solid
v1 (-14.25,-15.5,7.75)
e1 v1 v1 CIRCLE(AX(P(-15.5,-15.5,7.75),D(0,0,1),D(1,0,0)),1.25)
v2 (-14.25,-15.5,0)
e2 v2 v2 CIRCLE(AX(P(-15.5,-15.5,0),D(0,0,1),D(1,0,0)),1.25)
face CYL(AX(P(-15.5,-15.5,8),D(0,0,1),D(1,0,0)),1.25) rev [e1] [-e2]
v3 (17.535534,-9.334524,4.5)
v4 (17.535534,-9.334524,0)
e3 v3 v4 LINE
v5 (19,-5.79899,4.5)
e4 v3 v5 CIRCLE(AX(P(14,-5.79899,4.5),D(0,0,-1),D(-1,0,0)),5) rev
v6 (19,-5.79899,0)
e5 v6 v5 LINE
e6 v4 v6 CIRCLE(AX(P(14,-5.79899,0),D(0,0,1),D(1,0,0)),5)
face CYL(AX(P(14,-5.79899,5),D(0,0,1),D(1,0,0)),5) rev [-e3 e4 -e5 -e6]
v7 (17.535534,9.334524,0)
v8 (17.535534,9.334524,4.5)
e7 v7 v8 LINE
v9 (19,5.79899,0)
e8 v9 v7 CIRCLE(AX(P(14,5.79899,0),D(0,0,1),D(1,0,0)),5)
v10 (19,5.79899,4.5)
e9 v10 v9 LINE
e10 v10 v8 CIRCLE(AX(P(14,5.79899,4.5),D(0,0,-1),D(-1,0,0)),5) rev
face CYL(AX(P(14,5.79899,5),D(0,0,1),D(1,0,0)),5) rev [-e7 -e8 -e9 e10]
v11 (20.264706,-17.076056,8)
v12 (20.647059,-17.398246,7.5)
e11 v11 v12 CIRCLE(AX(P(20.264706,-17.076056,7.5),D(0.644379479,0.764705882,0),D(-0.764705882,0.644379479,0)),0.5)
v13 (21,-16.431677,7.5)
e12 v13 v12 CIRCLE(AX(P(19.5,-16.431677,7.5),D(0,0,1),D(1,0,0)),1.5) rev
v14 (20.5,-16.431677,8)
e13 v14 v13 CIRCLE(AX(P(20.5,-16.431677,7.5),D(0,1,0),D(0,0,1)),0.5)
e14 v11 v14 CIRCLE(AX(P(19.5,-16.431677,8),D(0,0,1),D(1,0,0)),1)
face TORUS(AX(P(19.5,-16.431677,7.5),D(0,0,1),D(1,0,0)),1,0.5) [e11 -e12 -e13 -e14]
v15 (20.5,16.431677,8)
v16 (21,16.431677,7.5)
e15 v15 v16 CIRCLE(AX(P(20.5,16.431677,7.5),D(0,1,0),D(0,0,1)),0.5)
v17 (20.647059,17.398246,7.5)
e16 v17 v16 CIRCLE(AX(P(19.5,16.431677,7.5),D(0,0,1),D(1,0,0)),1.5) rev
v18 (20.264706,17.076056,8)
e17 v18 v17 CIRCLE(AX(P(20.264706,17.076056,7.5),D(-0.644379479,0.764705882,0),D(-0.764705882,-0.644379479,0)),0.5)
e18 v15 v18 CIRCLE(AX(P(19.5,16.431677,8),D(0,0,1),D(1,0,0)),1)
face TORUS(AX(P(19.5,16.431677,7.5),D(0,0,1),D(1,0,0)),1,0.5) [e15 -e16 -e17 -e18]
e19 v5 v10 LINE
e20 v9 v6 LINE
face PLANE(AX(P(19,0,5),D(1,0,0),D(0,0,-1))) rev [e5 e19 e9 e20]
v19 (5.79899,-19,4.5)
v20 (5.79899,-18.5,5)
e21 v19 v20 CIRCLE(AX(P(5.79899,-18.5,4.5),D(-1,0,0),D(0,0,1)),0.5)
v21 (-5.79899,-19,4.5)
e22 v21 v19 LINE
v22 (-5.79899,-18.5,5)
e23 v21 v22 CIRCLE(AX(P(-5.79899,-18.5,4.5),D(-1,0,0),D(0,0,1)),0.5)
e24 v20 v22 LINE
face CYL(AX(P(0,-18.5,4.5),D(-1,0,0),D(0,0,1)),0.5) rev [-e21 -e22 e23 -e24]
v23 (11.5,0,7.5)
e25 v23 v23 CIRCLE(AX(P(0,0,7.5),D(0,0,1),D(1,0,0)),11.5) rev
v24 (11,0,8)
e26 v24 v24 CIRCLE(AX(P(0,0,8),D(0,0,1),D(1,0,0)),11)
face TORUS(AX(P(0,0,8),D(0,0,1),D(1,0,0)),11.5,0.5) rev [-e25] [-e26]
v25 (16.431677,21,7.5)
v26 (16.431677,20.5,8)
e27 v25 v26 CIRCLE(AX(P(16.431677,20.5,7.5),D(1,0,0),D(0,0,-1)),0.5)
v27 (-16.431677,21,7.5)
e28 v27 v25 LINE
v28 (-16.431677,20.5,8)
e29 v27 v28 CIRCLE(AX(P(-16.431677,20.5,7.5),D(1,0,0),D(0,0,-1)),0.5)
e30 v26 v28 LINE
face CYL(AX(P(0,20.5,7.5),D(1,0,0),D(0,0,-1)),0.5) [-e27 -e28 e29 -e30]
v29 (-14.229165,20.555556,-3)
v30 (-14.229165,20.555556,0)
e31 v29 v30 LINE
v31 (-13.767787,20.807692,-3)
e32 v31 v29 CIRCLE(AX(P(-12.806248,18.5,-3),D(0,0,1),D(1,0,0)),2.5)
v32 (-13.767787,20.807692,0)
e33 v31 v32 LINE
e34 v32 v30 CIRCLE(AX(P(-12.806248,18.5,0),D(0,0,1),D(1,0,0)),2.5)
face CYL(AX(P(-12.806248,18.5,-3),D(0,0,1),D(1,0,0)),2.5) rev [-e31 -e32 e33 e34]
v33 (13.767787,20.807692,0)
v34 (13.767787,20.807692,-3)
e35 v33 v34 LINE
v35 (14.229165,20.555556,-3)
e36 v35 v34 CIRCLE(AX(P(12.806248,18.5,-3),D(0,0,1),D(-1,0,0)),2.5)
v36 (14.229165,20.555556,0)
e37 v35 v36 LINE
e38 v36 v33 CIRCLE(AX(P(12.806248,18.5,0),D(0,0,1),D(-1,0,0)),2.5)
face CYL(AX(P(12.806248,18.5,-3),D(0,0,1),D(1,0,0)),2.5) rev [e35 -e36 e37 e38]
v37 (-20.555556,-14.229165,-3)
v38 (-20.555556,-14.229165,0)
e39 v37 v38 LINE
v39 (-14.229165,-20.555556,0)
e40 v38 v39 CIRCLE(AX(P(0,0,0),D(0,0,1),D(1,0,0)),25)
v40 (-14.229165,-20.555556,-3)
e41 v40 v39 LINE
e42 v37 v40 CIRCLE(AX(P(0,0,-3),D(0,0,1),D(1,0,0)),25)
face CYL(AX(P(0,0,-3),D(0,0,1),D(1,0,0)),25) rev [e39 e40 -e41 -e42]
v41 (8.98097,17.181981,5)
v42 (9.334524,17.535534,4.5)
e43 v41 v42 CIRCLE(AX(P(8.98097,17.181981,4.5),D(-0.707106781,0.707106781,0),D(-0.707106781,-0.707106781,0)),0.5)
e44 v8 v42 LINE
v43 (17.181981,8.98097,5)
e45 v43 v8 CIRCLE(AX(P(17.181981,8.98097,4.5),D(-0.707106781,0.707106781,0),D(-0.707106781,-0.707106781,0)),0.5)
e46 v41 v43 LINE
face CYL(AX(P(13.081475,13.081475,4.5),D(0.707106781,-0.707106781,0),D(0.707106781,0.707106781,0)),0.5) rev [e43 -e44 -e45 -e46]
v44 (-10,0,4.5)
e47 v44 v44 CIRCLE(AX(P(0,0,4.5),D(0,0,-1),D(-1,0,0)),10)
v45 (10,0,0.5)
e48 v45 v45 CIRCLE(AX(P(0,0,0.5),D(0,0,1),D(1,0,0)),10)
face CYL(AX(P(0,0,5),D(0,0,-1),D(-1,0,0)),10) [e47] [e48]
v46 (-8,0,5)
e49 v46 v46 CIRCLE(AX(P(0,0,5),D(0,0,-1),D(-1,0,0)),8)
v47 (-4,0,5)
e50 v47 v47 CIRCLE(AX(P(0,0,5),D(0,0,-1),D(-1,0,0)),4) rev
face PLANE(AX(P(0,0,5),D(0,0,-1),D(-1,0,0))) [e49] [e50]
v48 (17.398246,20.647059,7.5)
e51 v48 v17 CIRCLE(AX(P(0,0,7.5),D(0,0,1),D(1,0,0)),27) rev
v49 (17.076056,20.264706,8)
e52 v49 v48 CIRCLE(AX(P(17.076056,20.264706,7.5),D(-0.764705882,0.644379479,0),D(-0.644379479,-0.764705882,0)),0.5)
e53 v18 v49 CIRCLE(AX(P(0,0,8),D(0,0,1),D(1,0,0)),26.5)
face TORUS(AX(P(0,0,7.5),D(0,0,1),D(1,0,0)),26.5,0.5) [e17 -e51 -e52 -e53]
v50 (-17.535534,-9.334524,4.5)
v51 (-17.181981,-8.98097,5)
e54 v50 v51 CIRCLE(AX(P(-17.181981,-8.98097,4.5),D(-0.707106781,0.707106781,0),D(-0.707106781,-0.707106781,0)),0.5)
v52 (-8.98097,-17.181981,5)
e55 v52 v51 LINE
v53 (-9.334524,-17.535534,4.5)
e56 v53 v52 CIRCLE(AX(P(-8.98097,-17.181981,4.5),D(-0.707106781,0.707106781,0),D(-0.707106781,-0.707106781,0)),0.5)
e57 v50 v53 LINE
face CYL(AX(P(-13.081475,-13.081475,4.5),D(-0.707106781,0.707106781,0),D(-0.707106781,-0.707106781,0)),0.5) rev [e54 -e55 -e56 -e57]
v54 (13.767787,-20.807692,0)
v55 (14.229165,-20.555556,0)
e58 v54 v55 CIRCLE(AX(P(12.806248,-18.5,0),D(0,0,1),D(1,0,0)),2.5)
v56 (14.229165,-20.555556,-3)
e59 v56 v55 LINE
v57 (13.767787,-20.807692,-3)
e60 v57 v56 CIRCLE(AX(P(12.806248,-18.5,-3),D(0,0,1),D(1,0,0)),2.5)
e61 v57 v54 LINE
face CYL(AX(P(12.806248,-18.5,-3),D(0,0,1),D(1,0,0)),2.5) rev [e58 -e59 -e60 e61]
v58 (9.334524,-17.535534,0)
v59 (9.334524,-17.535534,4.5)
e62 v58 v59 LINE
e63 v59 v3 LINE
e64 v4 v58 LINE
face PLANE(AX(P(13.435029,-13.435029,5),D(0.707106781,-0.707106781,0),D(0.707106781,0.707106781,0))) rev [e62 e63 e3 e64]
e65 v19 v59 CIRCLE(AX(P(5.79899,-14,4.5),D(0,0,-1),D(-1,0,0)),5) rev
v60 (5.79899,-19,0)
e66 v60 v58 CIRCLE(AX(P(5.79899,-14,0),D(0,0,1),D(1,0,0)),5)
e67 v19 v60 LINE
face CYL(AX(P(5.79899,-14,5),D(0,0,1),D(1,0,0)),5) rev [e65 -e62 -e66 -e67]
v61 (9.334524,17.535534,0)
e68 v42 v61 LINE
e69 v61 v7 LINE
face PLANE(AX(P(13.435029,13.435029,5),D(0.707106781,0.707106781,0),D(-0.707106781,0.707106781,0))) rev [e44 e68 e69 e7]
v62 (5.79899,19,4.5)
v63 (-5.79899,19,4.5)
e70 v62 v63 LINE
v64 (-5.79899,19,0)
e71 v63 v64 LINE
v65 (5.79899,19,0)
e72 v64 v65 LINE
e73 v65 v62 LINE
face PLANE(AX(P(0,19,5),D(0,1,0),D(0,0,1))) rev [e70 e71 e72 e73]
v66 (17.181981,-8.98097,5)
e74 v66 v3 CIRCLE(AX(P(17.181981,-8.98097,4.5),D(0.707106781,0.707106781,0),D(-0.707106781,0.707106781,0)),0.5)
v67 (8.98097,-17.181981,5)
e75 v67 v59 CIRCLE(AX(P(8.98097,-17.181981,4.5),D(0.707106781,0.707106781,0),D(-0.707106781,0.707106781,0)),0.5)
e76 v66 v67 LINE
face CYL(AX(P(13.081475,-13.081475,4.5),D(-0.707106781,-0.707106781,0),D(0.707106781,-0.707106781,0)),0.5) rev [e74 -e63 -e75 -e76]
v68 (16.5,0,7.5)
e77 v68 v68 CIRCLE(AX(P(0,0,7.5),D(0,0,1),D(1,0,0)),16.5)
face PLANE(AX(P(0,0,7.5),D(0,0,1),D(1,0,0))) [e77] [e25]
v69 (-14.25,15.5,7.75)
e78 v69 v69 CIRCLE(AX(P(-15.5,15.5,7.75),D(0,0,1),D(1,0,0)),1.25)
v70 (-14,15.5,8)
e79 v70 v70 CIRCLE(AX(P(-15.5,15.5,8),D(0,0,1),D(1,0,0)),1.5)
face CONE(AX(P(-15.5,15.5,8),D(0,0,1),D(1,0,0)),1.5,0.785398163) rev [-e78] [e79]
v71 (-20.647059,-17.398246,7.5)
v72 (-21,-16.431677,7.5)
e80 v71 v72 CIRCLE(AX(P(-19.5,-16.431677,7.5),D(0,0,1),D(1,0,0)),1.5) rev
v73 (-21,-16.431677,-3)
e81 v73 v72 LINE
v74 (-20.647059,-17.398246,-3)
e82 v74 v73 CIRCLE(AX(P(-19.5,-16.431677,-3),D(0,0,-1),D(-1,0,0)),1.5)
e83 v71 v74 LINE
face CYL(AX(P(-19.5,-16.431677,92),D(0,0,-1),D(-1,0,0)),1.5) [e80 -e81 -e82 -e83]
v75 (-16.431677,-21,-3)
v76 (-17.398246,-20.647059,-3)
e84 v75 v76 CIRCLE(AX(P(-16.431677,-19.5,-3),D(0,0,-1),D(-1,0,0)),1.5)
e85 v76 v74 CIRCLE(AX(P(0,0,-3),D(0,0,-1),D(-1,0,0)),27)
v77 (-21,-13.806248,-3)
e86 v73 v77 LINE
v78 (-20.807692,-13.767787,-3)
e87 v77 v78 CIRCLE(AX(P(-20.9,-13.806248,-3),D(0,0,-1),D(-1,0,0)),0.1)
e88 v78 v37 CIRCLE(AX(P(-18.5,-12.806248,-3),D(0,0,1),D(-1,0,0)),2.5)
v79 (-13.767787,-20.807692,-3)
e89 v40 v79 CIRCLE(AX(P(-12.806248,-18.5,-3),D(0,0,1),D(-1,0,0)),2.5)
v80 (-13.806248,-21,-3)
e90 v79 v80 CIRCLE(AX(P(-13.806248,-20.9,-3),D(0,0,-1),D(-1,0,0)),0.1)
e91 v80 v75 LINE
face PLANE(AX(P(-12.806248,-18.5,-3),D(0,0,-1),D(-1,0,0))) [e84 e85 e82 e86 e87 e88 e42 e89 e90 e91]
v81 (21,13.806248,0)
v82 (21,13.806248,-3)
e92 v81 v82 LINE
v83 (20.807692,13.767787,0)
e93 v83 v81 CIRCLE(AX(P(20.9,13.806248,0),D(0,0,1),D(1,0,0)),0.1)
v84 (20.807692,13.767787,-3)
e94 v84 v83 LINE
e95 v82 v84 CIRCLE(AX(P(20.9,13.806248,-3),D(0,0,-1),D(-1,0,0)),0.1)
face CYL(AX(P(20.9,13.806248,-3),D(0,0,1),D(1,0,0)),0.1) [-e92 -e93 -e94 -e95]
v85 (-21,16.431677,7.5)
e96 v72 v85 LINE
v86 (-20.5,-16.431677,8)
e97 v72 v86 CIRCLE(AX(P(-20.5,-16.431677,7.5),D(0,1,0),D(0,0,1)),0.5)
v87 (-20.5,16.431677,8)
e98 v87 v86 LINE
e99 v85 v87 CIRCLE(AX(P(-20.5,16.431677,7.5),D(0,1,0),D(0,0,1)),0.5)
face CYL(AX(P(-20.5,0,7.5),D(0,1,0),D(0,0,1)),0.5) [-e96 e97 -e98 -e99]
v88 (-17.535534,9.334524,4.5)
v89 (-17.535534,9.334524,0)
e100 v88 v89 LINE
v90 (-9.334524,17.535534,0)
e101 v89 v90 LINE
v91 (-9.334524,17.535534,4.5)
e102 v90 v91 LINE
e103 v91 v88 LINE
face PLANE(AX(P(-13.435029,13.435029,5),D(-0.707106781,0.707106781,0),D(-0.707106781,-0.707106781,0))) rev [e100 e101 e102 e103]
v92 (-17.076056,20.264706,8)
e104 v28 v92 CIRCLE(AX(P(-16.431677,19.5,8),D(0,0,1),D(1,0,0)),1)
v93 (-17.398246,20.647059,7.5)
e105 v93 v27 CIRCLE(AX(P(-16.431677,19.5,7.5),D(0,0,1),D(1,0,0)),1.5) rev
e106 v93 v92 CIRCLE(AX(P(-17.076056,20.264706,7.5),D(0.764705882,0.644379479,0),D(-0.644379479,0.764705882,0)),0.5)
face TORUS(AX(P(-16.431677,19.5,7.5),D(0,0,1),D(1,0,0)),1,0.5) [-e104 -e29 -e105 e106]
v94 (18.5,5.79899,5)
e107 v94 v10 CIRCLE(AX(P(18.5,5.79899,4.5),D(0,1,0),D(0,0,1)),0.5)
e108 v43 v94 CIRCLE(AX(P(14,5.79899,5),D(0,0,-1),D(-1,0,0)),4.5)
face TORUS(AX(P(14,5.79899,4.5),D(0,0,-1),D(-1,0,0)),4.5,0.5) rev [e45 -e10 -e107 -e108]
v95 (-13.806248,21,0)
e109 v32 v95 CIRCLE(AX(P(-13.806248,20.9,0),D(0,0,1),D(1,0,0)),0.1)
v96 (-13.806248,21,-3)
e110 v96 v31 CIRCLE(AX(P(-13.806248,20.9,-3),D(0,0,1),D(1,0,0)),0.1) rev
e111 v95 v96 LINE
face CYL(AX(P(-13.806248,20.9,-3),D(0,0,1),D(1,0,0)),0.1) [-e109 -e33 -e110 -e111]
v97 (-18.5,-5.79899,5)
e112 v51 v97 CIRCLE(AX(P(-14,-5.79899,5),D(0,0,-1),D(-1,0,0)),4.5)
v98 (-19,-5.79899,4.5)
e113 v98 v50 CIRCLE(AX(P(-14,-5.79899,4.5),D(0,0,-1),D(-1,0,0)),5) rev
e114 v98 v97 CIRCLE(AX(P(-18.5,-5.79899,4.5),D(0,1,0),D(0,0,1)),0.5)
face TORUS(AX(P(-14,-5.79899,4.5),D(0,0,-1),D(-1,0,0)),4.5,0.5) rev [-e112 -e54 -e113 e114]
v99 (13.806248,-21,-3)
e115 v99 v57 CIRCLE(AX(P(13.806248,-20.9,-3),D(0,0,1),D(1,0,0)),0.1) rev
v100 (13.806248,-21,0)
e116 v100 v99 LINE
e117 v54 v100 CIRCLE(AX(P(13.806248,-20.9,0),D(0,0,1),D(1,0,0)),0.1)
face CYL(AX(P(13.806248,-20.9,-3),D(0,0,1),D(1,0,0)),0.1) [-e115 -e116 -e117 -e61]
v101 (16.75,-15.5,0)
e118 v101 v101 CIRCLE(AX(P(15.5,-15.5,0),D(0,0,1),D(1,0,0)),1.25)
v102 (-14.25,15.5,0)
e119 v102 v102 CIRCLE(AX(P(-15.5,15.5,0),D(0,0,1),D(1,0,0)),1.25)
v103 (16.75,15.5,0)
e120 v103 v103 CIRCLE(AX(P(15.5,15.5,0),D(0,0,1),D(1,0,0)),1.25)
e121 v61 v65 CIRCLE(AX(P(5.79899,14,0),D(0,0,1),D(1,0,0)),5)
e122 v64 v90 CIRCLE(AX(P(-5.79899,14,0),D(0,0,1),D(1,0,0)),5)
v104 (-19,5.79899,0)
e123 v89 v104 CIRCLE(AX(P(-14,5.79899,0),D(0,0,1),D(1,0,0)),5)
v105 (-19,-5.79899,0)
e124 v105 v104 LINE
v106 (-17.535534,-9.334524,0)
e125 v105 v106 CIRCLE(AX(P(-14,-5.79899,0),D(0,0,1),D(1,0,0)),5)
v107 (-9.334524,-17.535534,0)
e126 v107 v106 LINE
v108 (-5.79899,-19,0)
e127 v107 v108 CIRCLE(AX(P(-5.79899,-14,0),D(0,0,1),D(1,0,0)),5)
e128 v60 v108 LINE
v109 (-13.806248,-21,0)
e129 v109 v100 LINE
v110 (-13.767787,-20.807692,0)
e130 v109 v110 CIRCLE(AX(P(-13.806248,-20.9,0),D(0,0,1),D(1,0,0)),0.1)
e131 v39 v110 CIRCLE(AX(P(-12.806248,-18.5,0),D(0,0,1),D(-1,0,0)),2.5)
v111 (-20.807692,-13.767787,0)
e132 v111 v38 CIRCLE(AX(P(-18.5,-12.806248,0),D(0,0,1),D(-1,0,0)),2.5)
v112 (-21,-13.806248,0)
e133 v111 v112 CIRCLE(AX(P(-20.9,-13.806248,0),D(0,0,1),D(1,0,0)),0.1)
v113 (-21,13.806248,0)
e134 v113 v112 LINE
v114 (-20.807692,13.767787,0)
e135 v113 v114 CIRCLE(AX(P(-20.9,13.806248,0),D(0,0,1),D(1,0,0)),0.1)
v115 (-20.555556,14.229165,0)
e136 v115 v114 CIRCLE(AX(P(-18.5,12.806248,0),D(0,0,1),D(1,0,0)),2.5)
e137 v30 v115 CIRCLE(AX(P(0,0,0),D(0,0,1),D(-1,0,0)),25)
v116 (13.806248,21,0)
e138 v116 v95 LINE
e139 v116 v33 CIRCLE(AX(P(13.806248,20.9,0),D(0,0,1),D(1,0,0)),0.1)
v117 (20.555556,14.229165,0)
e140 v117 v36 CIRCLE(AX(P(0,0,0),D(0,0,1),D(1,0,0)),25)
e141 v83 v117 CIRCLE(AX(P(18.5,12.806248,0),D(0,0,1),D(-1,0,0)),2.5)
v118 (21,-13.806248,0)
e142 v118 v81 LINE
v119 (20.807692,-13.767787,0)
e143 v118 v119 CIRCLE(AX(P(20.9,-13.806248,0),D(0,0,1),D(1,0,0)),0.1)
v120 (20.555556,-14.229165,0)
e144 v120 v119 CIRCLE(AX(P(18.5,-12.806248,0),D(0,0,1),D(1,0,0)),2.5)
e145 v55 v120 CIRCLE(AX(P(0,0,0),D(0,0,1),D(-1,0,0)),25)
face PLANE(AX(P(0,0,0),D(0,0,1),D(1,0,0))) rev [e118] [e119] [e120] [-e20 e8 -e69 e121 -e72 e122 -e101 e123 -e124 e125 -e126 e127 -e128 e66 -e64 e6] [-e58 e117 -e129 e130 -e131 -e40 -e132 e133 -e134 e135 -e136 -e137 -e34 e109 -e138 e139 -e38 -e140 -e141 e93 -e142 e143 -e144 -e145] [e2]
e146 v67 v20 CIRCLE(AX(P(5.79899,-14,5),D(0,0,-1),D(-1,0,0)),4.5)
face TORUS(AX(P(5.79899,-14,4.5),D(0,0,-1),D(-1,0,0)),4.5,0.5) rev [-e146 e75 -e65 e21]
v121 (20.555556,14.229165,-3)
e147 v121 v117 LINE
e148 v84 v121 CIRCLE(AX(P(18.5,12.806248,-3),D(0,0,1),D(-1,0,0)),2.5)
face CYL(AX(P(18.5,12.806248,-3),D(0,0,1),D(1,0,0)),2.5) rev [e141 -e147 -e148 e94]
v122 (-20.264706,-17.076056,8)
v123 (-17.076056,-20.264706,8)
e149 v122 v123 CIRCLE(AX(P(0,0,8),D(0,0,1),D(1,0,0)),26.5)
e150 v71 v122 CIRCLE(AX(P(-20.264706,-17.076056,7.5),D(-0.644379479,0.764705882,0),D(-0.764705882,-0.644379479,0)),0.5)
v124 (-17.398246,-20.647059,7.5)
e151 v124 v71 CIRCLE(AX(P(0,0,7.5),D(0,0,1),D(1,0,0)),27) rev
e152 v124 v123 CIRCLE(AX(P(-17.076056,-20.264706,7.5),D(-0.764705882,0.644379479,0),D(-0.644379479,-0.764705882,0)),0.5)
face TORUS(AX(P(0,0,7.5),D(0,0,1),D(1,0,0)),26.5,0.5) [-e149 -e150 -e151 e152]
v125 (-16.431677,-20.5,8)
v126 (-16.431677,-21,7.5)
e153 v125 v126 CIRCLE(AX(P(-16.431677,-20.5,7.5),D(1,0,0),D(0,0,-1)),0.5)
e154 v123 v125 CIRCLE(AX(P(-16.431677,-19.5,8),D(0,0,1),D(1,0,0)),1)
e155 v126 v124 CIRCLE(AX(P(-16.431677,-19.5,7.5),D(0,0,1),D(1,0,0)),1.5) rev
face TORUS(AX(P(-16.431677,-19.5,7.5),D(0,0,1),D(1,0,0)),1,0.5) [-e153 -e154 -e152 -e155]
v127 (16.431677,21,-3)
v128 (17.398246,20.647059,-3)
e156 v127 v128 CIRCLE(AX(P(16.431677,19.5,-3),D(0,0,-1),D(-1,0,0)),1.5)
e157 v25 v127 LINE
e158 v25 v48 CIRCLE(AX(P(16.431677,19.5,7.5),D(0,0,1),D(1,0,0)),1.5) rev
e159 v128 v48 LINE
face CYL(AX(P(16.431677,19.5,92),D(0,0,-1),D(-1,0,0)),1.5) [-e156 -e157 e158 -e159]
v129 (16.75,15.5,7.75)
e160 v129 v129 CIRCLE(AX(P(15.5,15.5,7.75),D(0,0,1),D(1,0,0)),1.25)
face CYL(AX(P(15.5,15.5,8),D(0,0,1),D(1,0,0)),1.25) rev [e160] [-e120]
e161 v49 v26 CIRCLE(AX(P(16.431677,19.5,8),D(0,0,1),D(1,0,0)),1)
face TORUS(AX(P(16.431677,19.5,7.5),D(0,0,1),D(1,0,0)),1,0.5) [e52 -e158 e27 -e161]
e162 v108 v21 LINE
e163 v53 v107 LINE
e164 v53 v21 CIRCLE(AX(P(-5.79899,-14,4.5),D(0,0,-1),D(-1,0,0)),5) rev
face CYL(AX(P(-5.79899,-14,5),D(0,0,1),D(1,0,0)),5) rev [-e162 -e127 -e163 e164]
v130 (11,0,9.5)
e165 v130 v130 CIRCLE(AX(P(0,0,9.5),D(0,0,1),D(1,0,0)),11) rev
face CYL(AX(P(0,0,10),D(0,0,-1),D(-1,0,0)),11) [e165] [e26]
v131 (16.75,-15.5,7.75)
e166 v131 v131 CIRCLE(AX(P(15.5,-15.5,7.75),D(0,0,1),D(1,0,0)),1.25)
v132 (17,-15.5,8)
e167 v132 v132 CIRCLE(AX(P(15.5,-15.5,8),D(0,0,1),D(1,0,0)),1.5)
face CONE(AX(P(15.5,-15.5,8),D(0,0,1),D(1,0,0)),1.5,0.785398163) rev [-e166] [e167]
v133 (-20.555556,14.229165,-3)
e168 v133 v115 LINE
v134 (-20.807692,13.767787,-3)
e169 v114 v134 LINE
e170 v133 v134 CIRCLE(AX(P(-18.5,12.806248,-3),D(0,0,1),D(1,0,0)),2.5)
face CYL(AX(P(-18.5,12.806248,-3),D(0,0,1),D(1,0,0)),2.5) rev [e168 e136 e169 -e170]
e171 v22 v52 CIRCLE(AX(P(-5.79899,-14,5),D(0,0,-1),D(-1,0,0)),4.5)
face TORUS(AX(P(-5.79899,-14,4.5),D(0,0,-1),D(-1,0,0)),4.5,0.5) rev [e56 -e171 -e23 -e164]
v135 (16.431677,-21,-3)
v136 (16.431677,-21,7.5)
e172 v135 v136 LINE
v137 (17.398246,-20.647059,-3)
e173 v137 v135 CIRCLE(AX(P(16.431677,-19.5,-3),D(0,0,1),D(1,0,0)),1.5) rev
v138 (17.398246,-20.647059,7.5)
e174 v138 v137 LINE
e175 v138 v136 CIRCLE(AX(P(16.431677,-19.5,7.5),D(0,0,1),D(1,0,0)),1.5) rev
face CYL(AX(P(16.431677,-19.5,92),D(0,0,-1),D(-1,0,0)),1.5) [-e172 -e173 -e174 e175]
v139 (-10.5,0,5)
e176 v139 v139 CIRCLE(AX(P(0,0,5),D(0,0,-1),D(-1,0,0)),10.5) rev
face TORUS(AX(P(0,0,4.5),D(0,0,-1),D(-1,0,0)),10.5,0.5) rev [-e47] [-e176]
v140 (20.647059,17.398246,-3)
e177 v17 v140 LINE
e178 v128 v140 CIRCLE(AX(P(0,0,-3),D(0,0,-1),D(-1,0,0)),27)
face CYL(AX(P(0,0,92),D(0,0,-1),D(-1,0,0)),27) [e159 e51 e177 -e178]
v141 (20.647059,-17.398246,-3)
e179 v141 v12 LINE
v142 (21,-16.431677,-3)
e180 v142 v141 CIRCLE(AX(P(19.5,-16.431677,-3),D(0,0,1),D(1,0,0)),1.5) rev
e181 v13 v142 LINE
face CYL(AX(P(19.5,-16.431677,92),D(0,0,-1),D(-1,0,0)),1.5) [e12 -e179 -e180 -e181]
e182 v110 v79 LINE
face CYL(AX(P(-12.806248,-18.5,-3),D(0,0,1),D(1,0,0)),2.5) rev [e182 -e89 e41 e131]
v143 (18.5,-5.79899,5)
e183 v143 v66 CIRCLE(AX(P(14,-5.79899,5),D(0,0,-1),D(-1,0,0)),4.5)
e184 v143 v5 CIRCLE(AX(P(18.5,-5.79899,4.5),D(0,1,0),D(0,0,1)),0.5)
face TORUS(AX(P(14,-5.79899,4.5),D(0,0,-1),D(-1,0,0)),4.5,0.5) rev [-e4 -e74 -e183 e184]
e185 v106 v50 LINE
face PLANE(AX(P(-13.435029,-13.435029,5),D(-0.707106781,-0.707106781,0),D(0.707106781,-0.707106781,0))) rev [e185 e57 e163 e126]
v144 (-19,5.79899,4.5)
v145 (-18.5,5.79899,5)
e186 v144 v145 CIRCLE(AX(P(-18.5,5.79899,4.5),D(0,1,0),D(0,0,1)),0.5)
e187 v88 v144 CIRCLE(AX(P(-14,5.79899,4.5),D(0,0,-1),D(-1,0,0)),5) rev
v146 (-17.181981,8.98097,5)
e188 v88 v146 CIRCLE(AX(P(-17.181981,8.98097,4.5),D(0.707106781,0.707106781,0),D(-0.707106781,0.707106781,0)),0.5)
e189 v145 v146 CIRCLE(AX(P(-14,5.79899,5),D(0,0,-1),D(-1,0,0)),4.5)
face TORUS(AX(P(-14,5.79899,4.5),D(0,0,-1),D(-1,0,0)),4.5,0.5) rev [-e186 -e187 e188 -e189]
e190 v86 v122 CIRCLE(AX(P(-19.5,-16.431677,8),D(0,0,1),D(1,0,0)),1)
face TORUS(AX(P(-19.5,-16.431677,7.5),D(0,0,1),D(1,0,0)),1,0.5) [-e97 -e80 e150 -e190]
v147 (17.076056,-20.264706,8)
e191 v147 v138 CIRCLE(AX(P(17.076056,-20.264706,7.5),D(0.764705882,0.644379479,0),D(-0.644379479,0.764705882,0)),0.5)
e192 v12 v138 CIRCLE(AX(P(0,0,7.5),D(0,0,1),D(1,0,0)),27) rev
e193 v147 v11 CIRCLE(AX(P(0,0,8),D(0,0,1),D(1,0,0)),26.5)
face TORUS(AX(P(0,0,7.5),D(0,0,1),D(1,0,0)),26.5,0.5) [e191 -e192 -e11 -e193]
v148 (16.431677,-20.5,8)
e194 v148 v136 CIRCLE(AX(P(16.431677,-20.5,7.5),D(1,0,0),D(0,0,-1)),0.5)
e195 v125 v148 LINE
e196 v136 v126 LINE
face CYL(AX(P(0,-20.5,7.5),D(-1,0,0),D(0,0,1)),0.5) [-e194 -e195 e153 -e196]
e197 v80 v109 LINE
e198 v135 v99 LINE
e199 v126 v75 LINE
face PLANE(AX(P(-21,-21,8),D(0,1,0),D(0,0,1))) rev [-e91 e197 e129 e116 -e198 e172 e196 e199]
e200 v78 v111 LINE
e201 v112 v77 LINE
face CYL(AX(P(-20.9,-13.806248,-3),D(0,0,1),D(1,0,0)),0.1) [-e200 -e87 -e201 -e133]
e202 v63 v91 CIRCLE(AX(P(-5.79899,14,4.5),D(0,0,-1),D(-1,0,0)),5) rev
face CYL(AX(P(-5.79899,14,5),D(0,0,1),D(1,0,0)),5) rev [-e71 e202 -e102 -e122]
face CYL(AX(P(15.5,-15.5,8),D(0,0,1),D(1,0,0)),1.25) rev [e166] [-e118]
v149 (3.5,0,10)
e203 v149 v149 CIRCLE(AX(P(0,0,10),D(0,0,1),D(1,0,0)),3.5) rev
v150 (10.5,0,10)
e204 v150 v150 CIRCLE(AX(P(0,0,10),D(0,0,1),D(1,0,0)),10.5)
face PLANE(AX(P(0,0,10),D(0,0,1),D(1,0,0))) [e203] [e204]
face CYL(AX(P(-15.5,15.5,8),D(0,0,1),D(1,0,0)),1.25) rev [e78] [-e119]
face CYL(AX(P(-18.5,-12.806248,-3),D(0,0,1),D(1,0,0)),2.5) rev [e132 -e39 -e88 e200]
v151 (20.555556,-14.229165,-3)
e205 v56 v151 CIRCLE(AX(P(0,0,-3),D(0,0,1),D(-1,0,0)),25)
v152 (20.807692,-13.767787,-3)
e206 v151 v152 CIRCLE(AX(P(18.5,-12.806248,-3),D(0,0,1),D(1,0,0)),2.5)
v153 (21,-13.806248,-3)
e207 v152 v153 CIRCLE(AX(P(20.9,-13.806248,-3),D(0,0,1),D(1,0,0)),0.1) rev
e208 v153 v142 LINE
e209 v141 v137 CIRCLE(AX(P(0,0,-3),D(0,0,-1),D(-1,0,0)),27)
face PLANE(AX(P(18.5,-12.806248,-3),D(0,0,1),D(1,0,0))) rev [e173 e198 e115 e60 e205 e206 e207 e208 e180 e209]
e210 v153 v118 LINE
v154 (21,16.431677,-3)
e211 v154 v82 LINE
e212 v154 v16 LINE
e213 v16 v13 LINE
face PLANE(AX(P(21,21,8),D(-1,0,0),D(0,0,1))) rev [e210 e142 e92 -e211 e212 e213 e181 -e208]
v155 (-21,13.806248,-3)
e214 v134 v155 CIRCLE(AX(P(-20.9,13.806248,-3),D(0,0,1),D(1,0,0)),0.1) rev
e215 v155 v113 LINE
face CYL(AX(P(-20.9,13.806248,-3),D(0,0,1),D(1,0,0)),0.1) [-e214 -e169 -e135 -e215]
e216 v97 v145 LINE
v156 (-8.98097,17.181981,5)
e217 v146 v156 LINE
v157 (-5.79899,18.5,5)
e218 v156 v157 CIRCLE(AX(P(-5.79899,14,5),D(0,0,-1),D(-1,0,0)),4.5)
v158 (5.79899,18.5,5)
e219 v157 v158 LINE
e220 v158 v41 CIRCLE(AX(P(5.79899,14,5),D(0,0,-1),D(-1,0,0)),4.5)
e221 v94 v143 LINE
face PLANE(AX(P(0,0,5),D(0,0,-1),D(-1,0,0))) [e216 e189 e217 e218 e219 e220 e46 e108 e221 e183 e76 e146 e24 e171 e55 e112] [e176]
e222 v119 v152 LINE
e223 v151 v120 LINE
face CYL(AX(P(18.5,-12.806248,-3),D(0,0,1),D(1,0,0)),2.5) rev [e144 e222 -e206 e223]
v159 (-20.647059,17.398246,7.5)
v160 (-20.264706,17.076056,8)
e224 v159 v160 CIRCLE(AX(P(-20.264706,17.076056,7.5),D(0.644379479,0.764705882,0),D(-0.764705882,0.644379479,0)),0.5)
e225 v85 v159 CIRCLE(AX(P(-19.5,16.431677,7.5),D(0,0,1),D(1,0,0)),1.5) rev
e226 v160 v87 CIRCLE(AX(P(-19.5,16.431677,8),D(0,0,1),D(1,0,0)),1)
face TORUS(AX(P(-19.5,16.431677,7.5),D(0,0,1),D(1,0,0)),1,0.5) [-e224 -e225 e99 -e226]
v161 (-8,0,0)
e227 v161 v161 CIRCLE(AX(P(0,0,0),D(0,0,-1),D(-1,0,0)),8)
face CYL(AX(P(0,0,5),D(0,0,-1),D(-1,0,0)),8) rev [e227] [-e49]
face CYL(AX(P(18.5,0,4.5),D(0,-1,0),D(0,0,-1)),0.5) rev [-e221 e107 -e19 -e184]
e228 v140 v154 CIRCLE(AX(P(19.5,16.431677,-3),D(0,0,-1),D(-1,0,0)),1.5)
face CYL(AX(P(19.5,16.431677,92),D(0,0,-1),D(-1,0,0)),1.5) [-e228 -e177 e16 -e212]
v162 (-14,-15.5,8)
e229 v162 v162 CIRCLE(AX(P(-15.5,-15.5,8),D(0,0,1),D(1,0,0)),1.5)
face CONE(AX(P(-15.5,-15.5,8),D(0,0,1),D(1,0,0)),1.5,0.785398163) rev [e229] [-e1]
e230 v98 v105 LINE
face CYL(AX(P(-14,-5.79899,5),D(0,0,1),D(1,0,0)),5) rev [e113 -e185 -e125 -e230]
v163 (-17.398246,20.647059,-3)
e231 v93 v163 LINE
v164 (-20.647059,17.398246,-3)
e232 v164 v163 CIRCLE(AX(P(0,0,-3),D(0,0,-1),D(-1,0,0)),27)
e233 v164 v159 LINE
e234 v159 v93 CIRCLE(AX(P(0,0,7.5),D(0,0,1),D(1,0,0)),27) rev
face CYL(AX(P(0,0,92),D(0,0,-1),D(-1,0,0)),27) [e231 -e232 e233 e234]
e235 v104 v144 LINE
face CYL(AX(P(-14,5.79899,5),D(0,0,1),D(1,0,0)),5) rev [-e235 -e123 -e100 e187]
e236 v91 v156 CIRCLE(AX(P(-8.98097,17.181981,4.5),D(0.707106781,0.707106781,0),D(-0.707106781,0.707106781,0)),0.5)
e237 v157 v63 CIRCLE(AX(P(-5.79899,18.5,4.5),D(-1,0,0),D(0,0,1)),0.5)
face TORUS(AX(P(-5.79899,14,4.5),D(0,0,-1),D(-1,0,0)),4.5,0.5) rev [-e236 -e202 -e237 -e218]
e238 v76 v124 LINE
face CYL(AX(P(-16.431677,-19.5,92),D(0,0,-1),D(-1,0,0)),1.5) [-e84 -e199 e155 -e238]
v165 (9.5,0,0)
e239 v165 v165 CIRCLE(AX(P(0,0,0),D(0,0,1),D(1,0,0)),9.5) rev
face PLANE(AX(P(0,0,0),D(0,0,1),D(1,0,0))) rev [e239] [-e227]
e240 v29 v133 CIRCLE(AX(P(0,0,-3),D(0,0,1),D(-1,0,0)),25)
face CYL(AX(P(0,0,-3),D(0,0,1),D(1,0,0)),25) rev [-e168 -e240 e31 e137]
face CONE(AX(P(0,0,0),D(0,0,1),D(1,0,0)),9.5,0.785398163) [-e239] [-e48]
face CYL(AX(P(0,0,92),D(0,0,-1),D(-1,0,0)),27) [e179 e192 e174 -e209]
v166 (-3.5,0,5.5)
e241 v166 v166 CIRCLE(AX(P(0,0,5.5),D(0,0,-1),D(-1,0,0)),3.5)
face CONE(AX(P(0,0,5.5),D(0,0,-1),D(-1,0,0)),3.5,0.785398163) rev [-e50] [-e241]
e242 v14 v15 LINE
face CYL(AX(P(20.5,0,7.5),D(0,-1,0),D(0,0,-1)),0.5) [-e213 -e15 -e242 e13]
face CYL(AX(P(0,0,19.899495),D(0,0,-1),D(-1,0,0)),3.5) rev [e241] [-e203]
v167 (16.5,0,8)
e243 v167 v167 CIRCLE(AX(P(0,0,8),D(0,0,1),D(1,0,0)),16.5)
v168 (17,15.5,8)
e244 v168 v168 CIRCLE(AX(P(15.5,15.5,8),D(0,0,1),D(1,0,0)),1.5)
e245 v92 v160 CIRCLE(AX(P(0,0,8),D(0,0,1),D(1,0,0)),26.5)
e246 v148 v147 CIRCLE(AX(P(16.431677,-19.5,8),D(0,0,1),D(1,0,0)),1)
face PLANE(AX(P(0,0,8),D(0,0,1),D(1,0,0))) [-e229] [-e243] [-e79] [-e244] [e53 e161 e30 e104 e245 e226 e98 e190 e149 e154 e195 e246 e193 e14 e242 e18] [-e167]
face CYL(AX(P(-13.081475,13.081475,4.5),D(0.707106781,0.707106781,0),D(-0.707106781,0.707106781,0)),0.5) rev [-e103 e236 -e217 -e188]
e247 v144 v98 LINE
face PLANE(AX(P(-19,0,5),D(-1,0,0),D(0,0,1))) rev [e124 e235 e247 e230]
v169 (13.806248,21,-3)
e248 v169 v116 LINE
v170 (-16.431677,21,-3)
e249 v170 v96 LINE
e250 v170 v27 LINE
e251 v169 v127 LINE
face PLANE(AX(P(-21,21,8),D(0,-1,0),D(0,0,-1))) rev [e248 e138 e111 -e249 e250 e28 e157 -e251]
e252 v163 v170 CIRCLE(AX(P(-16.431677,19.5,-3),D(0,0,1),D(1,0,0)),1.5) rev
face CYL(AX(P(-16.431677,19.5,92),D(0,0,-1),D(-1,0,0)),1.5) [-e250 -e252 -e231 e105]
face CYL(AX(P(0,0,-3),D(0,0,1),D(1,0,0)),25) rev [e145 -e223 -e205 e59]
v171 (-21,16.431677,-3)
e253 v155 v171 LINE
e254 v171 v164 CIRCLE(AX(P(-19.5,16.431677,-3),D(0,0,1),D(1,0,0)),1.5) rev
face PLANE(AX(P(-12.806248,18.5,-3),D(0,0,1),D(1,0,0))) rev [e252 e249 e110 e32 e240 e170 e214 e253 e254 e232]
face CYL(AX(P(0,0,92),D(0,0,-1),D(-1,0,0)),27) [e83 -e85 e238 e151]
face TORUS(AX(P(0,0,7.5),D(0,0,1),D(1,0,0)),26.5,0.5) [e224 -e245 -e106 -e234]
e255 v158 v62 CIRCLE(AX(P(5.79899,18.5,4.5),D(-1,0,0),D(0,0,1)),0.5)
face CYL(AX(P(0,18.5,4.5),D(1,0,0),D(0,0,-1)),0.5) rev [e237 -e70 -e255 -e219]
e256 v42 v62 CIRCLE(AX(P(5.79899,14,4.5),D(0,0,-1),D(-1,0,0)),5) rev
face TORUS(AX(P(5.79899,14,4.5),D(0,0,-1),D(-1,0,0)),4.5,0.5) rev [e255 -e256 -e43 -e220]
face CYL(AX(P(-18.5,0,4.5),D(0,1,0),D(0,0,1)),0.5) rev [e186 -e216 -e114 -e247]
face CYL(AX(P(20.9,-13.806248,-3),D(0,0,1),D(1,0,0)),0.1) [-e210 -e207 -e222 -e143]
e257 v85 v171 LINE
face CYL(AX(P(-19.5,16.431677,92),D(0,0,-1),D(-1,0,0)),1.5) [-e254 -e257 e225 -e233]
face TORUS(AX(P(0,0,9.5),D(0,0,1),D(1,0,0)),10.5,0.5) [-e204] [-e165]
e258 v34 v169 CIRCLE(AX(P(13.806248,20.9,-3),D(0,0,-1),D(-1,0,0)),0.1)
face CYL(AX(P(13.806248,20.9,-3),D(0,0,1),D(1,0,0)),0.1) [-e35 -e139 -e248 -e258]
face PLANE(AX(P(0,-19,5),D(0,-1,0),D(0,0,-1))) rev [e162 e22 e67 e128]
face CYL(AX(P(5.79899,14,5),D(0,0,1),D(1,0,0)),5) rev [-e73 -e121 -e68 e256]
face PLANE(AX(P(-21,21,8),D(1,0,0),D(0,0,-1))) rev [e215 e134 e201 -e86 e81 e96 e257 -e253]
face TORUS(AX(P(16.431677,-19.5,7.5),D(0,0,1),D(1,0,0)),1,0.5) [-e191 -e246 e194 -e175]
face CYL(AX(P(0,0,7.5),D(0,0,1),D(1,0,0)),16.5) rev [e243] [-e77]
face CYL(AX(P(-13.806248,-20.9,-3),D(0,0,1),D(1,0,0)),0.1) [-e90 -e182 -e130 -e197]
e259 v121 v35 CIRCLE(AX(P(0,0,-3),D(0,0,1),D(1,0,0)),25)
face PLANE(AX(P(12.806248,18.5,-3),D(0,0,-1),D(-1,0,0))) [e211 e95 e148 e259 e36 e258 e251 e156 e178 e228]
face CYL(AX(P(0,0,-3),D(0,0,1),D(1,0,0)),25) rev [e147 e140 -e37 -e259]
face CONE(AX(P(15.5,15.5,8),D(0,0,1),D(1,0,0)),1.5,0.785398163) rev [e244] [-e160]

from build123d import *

# Parameters (mm, degrees)
SKETCH1_W                         = 42
SKETCH1_H                         = 42
BOSS_EXTRUDE1_DEPTH               = 8
BOSS_EXTRUDE2_DEPTH               = 3
SKETCH3_R                         = 29.69848481
SKETCH3_R_2                       = 27
CUT_EXTRUDE1_DEPTH                = 11
SKETCH4_R                         = 10
SKETCH4_R_2                       = 8
CUT_EXTRUDE2_DEPTH                = 5
SKETCH5_R                         = 11
BOSS_EXTRUDE3_DEPTH               = 2
CUT_EXTRUDE3_START                = -0.5
SKETCH6_R                         = 16.5
SKETCH6_R_2                       = 11
CUT_EXTRUDE3_DEPTH                = 0.5
FILLET1_R                         = 0.5
FILLET3_R                         = 5
FILLET4_R                         = 1.5
FILLET5_START                     = -4
FILLET5_DEPTH                     = 4
SKETCH7_R                         = 3.5
CUT_EXTRUDE4_DEPTH                = 5
FILLET6_R                         = 0.5
CHAMFER1_SIZE                     = 0.5
FILLET7_R                         = 0.5
TAP_DRILL_FOR_M3_TAP2_D           = 2.5
TAP_DRILL_FOR_M3_TAP2_CSINK_D     = 3
TAP_DRILL_FOR_M3_TAP2_CSINK_ANGLE = 90


with BuildPart() as part:
    # Sketch1 → Boss-Extrude1 (new body)
    with BuildSketch(Plane.XY):
        Rectangle(SKETCH1_W, SKETCH1_H)
    extrude(amount=BOSS_EXTRUDE1_DEPTH)

    # Sketch2 → Boss-Extrude2 (add)
    with BuildSketch(Plane(origin=(0, 0, 0), x_dir=(-1, 0, 0), z_dir=(0, 0, -1))):
        with BuildLine():
            Line((-21, 12.806248475), (-21, 21))
            Line((-21, 21), (-12.806248475, 21))
            ThreePointArc((-12.806248475, 21), (-13.551604467, 20.886303511), (-14.229164972, 20.555555556))
            ThreePointArc((-14.229164972, 20.555555556), (-17.67766953, 17.67766953), (-20.555555556, 14.229164972))
            ThreePointArc((-20.555555556, 14.229164972), (-20.886303511, 13.551604467), (-21, 12.806248475))
        make_face()
        with BuildLine():
            Line((-21, -12.806248475), (-21, -21))
            Line((-21, -21), (-12.806248475, -21))
            ThreePointArc((-12.806248475, -21), (-13.551604467, -20.886303511), (-14.229164972, -20.555555556))
            ThreePointArc((-14.229164972, -20.555555556), (-17.67766953, -17.67766953), (-20.555555556, -14.229164972))
            ThreePointArc((-20.555555556, -14.229164972), (-20.886303511, -13.551604467), (-21, -12.806248475))
        make_face()
        with BuildLine():
            Line((21, 21), (12.806248475, 21))
            ThreePointArc((12.806248475, 21), (13.551604467, 20.886303511), (14.229164972, 20.555555556))
            ThreePointArc((14.229164972, 20.555555556), (17.67766953, 17.67766953), (20.555555556, 14.229164972))
            ThreePointArc((20.555555556, 14.229164972), (20.886303511, 13.551604467), (21, 12.806248475))
            Line((21, 12.806248475), (21, 21))
        make_face()
        with BuildLine():
            Line((21, -12.806248475), (21, -21))
            Line((21, -21), (12.806248475, -21))
            ThreePointArc((12.806248475, -21), (13.551604467, -20.886303511), (14.229164972, -20.555555556))
            ThreePointArc((14.229164972, -20.555555556), (17.67766953, -17.67766953), (20.555555556, -14.229164972))
            ThreePointArc((20.555555556, -14.229164972), (20.886303511, -13.551604467), (21, -12.806248475))
        make_face()
    extrude(amount=BOSS_EXTRUDE2_DEPTH)

    # Sketch3 → Cut-Extrude1 (cut)
    with BuildSketch(Plane(origin=(0, 0, -3), x_dir=(-1, 0, 0), z_dir=(0, 0, -1))):
        Circle(SKETCH3_R)
        Circle(SKETCH3_R_2, mode=Mode.SUBTRACT)
    extrude(amount=-CUT_EXTRUDE1_DEPTH, mode=Mode.SUBTRACT)

    # Sketch4 → Cut-Extrude2 (cut)
    # profile 1 of 2: a face of its own
    with BuildSketch(Plane(origin=(0, 0, 0), x_dir=(-1, 0, 0), z_dir=(0, 0, -1))):
        Polygon((7.870057685, -19), (19, -7.870057685), (19, 7.870057685), (7.870057685, 19), (-7.870057685, 19), (-19, 7.870057685), (-19, -7.870057685), (-7.870057685, -19), align=None)
        Circle(SKETCH4_R, mode=Mode.SUBTRACT)
    # profile 2 of 2: a face of its own
    with BuildSketch(Plane(origin=(0, 0, 0), x_dir=(-1, 0, 0), z_dir=(0, 0, -1))):
        Circle(SKETCH4_R_2)
    extrude(amount=-CUT_EXTRUDE2_DEPTH, mode=Mode.SUBTRACT)

    # Sketch5 → Boss-Extrude3 (add)
    with BuildSketch(Plane.XY.offset(8)):
        Circle(SKETCH5_R)
    extrude(amount=BOSS_EXTRUDE3_DEPTH)

    # Sketch6 → Cut-Extrude3 (cut)
    with BuildSketch(Plane.XY.offset(8).offset(CUT_EXTRUDE3_START)):
        Circle(SKETCH6_R)
        Circle(SKETCH6_R_2, mode=Mode.SUBTRACT)
    extrude(amount=CUT_EXTRUDE3_DEPTH, mode=Mode.SUBTRACT)

    # Fillet1
    fillet1_edges = [part.edges().sort_by_distance(p)[0] for p in [
        (-11, 0, 10),
        (-11, 0, 7.5),
    ]]
    fillet(fillet1_edges, radius=FILLET1_R)

    # Fillet3
    fillet3_edges = [part.edges().sort_by_distance(p)[0] for p in [
        (-19, -7.870057685, 2.5),
        (-7.870057685, -19, 2.5),
        (7.870057685, -19, 2.5),
        (19, -7.870057685, 2.5),
        (19, 7.870057685, 2.5),
        (7.870057685, 19, 2.5),
        (-7.870057685, 19, 2.5),
        (-19, 7.870057685, 2.5),
    ]]
    fillet(fillet3_edges, radius=FILLET3_R)

    # Fillet4
    fillet4_edges = [part.edges().sort_by_distance(p)[0] for p in [
        (21, 16.970562748, 2.5),
        (21, -16.970562748, 2.5),
        (-16.970562748, 21, 2.5),
        (16.970562748, 21, 2.5),
        (-21, -16.970562748, 2.5),
        (-21, 16.970562748, 2.5),
        (16.970562748, -21, 2.5),
        (-16.970562748, -21, 2.5),
    ]]
    fillet(fillet4_edges, radius=FILLET4_R)

    # Fillet5: read off the stored shape, not the designer's step
    # Fillet5 outline → Fillet5 (cut)
    with BuildSketch(Plane.XY.offset(FILLET5_START)):
        with BuildLine():
            ThreePointArc((-13.767786936, 20.807692308), (-13.296538813, 20.95145169), (-12.806248475, 21))
            Line((-12.806248475, 21), (-13.806248475, 21))
            ThreePointArc((-13.806248475, 21), (-13.708190407, 20.919611614), (-13.767786936, 20.807692308))
        make_face()
        with BuildLine():
            ThreePointArc((13.767786936, 20.807692308), (13.708190407, 20.919611614), (13.806248475, 21))
            Line((13.806248475, 21), (12.806248475, 21))
            ThreePointArc((12.806248475, 21), (13.296538813, 20.95145169), (13.767786936, 20.807692308))
        make_face()
        with BuildLine():
            Line((21, -13.806248475), (21, -12.806248475))
            ThreePointArc((21, -12.806248475), (20.95145169, -13.296538813), (20.807692308, -13.767786936))
            ThreePointArc((20.807692308, -13.767786936), (20.919611614, -13.708190407), (21, -13.806248475))
        make_face()
        with BuildLine():
            ThreePointArc((21, 13.806248475), (20.919611614, 13.708190407), (20.807692308, 13.767786936))
            ThreePointArc((20.807692308, 13.767786936), (20.95145169, 13.296538813), (21, 12.806248475))
            Line((21, 12.806248475), (21, 13.806248475))
        make_face()
        with BuildLine():
            Line((-13.806248475, -21), (-12.806248475, -21))
            ThreePointArc((-12.806248475, -21), (-13.296538813, -20.95145169), (-13.767786936, -20.807692308))
            ThreePointArc((-13.767786936, -20.807692308), (-13.708190407, -20.919611614), (-13.806248475, -21))
        make_face()
        with BuildLine():
            ThreePointArc((13.806248475, -21), (13.708190407, -20.919611614), (13.767786936, -20.807692308))
            ThreePointArc((13.767786936, -20.807692308), (13.296538813, -20.95145169), (12.806248475, -21))
            Line((12.806248475, -21), (13.806248475, -21))
        make_face()
        with BuildLine():
            Line((-21, 13.806248475), (-21, 12.806248475))
            ThreePointArc((-21, 12.806248475), (-20.95145169, 13.296538813), (-20.807692308, 13.767786936))
            ThreePointArc((-20.807692308, 13.767786936), (-20.919611614, 13.708190407), (-21, 13.806248475))
        make_face()
        with BuildLine():
            ThreePointArc((-21, -13.806248475), (-20.919611614, -13.708190407), (-20.807692308, -13.767786936))
            ThreePointArc((-20.807692308, -13.767786936), (-20.95145169, -13.296538813), (-21, -12.806248475))
            Line((-21, -12.806248475), (-21, -13.806248475))
        make_face()
    extrude(amount=FILLET5_DEPTH, mode=Mode.SUBTRACT)

    # Sketch7 → Cut-Extrude4 (cut)
    with BuildSketch(Plane(origin=(0, 0, 5), x_dir=(-1, 0, 0), z_dir=(0, 0, -1))):
        Circle(SKETCH7_R)
    extrude(amount=-CUT_EXTRUDE4_DEPTH, mode=Mode.SUBTRACT)

    # Fillet6
    fillet6_edges = [part.edges().sort_by_distance(p)[0] for p in [
        (10, 0, 5),
        (-13.435028843, -13.435028843, 5),
        (0, -19, 5),
        (-19, 0, 5),
        (-13.435028843, 13.435028843, 5),
        (0, 19, 5),
        (13.435028843, 13.435028843, 5),
        (19, 0, 5),
        (13.435028843, -13.435028843, 5),
        (7.712407035, 18.619397663, 5),
        (-18.619397663, -7.712407035, 5),
        (-18.619397663, 7.712407035, 5),
        (-7.712407035, 18.619397663, 5),
        (18.619397663, 7.712407035, 5),
        (18.619397663, -7.712407035, 5),
        (7.712407035, -18.619397663, 5),
        (-7.712407035, -18.619397663, 5),
    ]]
    fillet(fillet6_edges, radius=FILLET6_R)

    # Chamfer1
    chamfer1_edges = [part.edges().sort_by_distance(p)[0] for p in [
        (10, 0, 0),
        (3.5, 0, 5),
    ]]
    chamfer(chamfer1_edges, length=CHAMFER1_SIZE)

    # Fillet7
    fillet7_edges = [part.edges().sort_by_distance(p)[0] for p in [
        (19.091883092, -19.091883092, 8),
        (21, 0, 8),
        (19.091883092, 19.091883092, 8),
        (0, 21, 8),
        (-19.091883092, 19.091883092, 8),
        (-21, 0, 8),
        (-19.091883092, -19.091883092, 8),
        (0, -21, 8),
        (-16.946172481, -20.909004655, 8),
        (20.909004655, 16.946172481, 8),
        (16.946172481, 20.909004655, 8),
        (-16.946172481, 20.909004655, 8),
        (-20.909004655, 16.946172481, 8),
        (-20.909004655, -16.946172481, 8),
        (16.946172481, -20.909004655, 8),
        (20.909004655, -16.946172481, 8),
    ]]
    fillet(fillet7_edges, radius=FILLET7_R)

    # Tap Drill for M3 Tap2 (through all)
    with Locations(Plane.XY.offset(8)):
        with Locations((-15.5, 15.5), (15.5, -15.5), (-15.5, -15.5), (15.5, 15.5)):
            CounterSinkHole(TAP_DRILL_FOR_M3_TAP2_D / 2, TAP_DRILL_FOR_M3_TAP2_CSINK_D / 2, counter_sink_angle=TAP_DRILL_FOR_M3_TAP2_CSINK_ANGLE)


solid = part.part
